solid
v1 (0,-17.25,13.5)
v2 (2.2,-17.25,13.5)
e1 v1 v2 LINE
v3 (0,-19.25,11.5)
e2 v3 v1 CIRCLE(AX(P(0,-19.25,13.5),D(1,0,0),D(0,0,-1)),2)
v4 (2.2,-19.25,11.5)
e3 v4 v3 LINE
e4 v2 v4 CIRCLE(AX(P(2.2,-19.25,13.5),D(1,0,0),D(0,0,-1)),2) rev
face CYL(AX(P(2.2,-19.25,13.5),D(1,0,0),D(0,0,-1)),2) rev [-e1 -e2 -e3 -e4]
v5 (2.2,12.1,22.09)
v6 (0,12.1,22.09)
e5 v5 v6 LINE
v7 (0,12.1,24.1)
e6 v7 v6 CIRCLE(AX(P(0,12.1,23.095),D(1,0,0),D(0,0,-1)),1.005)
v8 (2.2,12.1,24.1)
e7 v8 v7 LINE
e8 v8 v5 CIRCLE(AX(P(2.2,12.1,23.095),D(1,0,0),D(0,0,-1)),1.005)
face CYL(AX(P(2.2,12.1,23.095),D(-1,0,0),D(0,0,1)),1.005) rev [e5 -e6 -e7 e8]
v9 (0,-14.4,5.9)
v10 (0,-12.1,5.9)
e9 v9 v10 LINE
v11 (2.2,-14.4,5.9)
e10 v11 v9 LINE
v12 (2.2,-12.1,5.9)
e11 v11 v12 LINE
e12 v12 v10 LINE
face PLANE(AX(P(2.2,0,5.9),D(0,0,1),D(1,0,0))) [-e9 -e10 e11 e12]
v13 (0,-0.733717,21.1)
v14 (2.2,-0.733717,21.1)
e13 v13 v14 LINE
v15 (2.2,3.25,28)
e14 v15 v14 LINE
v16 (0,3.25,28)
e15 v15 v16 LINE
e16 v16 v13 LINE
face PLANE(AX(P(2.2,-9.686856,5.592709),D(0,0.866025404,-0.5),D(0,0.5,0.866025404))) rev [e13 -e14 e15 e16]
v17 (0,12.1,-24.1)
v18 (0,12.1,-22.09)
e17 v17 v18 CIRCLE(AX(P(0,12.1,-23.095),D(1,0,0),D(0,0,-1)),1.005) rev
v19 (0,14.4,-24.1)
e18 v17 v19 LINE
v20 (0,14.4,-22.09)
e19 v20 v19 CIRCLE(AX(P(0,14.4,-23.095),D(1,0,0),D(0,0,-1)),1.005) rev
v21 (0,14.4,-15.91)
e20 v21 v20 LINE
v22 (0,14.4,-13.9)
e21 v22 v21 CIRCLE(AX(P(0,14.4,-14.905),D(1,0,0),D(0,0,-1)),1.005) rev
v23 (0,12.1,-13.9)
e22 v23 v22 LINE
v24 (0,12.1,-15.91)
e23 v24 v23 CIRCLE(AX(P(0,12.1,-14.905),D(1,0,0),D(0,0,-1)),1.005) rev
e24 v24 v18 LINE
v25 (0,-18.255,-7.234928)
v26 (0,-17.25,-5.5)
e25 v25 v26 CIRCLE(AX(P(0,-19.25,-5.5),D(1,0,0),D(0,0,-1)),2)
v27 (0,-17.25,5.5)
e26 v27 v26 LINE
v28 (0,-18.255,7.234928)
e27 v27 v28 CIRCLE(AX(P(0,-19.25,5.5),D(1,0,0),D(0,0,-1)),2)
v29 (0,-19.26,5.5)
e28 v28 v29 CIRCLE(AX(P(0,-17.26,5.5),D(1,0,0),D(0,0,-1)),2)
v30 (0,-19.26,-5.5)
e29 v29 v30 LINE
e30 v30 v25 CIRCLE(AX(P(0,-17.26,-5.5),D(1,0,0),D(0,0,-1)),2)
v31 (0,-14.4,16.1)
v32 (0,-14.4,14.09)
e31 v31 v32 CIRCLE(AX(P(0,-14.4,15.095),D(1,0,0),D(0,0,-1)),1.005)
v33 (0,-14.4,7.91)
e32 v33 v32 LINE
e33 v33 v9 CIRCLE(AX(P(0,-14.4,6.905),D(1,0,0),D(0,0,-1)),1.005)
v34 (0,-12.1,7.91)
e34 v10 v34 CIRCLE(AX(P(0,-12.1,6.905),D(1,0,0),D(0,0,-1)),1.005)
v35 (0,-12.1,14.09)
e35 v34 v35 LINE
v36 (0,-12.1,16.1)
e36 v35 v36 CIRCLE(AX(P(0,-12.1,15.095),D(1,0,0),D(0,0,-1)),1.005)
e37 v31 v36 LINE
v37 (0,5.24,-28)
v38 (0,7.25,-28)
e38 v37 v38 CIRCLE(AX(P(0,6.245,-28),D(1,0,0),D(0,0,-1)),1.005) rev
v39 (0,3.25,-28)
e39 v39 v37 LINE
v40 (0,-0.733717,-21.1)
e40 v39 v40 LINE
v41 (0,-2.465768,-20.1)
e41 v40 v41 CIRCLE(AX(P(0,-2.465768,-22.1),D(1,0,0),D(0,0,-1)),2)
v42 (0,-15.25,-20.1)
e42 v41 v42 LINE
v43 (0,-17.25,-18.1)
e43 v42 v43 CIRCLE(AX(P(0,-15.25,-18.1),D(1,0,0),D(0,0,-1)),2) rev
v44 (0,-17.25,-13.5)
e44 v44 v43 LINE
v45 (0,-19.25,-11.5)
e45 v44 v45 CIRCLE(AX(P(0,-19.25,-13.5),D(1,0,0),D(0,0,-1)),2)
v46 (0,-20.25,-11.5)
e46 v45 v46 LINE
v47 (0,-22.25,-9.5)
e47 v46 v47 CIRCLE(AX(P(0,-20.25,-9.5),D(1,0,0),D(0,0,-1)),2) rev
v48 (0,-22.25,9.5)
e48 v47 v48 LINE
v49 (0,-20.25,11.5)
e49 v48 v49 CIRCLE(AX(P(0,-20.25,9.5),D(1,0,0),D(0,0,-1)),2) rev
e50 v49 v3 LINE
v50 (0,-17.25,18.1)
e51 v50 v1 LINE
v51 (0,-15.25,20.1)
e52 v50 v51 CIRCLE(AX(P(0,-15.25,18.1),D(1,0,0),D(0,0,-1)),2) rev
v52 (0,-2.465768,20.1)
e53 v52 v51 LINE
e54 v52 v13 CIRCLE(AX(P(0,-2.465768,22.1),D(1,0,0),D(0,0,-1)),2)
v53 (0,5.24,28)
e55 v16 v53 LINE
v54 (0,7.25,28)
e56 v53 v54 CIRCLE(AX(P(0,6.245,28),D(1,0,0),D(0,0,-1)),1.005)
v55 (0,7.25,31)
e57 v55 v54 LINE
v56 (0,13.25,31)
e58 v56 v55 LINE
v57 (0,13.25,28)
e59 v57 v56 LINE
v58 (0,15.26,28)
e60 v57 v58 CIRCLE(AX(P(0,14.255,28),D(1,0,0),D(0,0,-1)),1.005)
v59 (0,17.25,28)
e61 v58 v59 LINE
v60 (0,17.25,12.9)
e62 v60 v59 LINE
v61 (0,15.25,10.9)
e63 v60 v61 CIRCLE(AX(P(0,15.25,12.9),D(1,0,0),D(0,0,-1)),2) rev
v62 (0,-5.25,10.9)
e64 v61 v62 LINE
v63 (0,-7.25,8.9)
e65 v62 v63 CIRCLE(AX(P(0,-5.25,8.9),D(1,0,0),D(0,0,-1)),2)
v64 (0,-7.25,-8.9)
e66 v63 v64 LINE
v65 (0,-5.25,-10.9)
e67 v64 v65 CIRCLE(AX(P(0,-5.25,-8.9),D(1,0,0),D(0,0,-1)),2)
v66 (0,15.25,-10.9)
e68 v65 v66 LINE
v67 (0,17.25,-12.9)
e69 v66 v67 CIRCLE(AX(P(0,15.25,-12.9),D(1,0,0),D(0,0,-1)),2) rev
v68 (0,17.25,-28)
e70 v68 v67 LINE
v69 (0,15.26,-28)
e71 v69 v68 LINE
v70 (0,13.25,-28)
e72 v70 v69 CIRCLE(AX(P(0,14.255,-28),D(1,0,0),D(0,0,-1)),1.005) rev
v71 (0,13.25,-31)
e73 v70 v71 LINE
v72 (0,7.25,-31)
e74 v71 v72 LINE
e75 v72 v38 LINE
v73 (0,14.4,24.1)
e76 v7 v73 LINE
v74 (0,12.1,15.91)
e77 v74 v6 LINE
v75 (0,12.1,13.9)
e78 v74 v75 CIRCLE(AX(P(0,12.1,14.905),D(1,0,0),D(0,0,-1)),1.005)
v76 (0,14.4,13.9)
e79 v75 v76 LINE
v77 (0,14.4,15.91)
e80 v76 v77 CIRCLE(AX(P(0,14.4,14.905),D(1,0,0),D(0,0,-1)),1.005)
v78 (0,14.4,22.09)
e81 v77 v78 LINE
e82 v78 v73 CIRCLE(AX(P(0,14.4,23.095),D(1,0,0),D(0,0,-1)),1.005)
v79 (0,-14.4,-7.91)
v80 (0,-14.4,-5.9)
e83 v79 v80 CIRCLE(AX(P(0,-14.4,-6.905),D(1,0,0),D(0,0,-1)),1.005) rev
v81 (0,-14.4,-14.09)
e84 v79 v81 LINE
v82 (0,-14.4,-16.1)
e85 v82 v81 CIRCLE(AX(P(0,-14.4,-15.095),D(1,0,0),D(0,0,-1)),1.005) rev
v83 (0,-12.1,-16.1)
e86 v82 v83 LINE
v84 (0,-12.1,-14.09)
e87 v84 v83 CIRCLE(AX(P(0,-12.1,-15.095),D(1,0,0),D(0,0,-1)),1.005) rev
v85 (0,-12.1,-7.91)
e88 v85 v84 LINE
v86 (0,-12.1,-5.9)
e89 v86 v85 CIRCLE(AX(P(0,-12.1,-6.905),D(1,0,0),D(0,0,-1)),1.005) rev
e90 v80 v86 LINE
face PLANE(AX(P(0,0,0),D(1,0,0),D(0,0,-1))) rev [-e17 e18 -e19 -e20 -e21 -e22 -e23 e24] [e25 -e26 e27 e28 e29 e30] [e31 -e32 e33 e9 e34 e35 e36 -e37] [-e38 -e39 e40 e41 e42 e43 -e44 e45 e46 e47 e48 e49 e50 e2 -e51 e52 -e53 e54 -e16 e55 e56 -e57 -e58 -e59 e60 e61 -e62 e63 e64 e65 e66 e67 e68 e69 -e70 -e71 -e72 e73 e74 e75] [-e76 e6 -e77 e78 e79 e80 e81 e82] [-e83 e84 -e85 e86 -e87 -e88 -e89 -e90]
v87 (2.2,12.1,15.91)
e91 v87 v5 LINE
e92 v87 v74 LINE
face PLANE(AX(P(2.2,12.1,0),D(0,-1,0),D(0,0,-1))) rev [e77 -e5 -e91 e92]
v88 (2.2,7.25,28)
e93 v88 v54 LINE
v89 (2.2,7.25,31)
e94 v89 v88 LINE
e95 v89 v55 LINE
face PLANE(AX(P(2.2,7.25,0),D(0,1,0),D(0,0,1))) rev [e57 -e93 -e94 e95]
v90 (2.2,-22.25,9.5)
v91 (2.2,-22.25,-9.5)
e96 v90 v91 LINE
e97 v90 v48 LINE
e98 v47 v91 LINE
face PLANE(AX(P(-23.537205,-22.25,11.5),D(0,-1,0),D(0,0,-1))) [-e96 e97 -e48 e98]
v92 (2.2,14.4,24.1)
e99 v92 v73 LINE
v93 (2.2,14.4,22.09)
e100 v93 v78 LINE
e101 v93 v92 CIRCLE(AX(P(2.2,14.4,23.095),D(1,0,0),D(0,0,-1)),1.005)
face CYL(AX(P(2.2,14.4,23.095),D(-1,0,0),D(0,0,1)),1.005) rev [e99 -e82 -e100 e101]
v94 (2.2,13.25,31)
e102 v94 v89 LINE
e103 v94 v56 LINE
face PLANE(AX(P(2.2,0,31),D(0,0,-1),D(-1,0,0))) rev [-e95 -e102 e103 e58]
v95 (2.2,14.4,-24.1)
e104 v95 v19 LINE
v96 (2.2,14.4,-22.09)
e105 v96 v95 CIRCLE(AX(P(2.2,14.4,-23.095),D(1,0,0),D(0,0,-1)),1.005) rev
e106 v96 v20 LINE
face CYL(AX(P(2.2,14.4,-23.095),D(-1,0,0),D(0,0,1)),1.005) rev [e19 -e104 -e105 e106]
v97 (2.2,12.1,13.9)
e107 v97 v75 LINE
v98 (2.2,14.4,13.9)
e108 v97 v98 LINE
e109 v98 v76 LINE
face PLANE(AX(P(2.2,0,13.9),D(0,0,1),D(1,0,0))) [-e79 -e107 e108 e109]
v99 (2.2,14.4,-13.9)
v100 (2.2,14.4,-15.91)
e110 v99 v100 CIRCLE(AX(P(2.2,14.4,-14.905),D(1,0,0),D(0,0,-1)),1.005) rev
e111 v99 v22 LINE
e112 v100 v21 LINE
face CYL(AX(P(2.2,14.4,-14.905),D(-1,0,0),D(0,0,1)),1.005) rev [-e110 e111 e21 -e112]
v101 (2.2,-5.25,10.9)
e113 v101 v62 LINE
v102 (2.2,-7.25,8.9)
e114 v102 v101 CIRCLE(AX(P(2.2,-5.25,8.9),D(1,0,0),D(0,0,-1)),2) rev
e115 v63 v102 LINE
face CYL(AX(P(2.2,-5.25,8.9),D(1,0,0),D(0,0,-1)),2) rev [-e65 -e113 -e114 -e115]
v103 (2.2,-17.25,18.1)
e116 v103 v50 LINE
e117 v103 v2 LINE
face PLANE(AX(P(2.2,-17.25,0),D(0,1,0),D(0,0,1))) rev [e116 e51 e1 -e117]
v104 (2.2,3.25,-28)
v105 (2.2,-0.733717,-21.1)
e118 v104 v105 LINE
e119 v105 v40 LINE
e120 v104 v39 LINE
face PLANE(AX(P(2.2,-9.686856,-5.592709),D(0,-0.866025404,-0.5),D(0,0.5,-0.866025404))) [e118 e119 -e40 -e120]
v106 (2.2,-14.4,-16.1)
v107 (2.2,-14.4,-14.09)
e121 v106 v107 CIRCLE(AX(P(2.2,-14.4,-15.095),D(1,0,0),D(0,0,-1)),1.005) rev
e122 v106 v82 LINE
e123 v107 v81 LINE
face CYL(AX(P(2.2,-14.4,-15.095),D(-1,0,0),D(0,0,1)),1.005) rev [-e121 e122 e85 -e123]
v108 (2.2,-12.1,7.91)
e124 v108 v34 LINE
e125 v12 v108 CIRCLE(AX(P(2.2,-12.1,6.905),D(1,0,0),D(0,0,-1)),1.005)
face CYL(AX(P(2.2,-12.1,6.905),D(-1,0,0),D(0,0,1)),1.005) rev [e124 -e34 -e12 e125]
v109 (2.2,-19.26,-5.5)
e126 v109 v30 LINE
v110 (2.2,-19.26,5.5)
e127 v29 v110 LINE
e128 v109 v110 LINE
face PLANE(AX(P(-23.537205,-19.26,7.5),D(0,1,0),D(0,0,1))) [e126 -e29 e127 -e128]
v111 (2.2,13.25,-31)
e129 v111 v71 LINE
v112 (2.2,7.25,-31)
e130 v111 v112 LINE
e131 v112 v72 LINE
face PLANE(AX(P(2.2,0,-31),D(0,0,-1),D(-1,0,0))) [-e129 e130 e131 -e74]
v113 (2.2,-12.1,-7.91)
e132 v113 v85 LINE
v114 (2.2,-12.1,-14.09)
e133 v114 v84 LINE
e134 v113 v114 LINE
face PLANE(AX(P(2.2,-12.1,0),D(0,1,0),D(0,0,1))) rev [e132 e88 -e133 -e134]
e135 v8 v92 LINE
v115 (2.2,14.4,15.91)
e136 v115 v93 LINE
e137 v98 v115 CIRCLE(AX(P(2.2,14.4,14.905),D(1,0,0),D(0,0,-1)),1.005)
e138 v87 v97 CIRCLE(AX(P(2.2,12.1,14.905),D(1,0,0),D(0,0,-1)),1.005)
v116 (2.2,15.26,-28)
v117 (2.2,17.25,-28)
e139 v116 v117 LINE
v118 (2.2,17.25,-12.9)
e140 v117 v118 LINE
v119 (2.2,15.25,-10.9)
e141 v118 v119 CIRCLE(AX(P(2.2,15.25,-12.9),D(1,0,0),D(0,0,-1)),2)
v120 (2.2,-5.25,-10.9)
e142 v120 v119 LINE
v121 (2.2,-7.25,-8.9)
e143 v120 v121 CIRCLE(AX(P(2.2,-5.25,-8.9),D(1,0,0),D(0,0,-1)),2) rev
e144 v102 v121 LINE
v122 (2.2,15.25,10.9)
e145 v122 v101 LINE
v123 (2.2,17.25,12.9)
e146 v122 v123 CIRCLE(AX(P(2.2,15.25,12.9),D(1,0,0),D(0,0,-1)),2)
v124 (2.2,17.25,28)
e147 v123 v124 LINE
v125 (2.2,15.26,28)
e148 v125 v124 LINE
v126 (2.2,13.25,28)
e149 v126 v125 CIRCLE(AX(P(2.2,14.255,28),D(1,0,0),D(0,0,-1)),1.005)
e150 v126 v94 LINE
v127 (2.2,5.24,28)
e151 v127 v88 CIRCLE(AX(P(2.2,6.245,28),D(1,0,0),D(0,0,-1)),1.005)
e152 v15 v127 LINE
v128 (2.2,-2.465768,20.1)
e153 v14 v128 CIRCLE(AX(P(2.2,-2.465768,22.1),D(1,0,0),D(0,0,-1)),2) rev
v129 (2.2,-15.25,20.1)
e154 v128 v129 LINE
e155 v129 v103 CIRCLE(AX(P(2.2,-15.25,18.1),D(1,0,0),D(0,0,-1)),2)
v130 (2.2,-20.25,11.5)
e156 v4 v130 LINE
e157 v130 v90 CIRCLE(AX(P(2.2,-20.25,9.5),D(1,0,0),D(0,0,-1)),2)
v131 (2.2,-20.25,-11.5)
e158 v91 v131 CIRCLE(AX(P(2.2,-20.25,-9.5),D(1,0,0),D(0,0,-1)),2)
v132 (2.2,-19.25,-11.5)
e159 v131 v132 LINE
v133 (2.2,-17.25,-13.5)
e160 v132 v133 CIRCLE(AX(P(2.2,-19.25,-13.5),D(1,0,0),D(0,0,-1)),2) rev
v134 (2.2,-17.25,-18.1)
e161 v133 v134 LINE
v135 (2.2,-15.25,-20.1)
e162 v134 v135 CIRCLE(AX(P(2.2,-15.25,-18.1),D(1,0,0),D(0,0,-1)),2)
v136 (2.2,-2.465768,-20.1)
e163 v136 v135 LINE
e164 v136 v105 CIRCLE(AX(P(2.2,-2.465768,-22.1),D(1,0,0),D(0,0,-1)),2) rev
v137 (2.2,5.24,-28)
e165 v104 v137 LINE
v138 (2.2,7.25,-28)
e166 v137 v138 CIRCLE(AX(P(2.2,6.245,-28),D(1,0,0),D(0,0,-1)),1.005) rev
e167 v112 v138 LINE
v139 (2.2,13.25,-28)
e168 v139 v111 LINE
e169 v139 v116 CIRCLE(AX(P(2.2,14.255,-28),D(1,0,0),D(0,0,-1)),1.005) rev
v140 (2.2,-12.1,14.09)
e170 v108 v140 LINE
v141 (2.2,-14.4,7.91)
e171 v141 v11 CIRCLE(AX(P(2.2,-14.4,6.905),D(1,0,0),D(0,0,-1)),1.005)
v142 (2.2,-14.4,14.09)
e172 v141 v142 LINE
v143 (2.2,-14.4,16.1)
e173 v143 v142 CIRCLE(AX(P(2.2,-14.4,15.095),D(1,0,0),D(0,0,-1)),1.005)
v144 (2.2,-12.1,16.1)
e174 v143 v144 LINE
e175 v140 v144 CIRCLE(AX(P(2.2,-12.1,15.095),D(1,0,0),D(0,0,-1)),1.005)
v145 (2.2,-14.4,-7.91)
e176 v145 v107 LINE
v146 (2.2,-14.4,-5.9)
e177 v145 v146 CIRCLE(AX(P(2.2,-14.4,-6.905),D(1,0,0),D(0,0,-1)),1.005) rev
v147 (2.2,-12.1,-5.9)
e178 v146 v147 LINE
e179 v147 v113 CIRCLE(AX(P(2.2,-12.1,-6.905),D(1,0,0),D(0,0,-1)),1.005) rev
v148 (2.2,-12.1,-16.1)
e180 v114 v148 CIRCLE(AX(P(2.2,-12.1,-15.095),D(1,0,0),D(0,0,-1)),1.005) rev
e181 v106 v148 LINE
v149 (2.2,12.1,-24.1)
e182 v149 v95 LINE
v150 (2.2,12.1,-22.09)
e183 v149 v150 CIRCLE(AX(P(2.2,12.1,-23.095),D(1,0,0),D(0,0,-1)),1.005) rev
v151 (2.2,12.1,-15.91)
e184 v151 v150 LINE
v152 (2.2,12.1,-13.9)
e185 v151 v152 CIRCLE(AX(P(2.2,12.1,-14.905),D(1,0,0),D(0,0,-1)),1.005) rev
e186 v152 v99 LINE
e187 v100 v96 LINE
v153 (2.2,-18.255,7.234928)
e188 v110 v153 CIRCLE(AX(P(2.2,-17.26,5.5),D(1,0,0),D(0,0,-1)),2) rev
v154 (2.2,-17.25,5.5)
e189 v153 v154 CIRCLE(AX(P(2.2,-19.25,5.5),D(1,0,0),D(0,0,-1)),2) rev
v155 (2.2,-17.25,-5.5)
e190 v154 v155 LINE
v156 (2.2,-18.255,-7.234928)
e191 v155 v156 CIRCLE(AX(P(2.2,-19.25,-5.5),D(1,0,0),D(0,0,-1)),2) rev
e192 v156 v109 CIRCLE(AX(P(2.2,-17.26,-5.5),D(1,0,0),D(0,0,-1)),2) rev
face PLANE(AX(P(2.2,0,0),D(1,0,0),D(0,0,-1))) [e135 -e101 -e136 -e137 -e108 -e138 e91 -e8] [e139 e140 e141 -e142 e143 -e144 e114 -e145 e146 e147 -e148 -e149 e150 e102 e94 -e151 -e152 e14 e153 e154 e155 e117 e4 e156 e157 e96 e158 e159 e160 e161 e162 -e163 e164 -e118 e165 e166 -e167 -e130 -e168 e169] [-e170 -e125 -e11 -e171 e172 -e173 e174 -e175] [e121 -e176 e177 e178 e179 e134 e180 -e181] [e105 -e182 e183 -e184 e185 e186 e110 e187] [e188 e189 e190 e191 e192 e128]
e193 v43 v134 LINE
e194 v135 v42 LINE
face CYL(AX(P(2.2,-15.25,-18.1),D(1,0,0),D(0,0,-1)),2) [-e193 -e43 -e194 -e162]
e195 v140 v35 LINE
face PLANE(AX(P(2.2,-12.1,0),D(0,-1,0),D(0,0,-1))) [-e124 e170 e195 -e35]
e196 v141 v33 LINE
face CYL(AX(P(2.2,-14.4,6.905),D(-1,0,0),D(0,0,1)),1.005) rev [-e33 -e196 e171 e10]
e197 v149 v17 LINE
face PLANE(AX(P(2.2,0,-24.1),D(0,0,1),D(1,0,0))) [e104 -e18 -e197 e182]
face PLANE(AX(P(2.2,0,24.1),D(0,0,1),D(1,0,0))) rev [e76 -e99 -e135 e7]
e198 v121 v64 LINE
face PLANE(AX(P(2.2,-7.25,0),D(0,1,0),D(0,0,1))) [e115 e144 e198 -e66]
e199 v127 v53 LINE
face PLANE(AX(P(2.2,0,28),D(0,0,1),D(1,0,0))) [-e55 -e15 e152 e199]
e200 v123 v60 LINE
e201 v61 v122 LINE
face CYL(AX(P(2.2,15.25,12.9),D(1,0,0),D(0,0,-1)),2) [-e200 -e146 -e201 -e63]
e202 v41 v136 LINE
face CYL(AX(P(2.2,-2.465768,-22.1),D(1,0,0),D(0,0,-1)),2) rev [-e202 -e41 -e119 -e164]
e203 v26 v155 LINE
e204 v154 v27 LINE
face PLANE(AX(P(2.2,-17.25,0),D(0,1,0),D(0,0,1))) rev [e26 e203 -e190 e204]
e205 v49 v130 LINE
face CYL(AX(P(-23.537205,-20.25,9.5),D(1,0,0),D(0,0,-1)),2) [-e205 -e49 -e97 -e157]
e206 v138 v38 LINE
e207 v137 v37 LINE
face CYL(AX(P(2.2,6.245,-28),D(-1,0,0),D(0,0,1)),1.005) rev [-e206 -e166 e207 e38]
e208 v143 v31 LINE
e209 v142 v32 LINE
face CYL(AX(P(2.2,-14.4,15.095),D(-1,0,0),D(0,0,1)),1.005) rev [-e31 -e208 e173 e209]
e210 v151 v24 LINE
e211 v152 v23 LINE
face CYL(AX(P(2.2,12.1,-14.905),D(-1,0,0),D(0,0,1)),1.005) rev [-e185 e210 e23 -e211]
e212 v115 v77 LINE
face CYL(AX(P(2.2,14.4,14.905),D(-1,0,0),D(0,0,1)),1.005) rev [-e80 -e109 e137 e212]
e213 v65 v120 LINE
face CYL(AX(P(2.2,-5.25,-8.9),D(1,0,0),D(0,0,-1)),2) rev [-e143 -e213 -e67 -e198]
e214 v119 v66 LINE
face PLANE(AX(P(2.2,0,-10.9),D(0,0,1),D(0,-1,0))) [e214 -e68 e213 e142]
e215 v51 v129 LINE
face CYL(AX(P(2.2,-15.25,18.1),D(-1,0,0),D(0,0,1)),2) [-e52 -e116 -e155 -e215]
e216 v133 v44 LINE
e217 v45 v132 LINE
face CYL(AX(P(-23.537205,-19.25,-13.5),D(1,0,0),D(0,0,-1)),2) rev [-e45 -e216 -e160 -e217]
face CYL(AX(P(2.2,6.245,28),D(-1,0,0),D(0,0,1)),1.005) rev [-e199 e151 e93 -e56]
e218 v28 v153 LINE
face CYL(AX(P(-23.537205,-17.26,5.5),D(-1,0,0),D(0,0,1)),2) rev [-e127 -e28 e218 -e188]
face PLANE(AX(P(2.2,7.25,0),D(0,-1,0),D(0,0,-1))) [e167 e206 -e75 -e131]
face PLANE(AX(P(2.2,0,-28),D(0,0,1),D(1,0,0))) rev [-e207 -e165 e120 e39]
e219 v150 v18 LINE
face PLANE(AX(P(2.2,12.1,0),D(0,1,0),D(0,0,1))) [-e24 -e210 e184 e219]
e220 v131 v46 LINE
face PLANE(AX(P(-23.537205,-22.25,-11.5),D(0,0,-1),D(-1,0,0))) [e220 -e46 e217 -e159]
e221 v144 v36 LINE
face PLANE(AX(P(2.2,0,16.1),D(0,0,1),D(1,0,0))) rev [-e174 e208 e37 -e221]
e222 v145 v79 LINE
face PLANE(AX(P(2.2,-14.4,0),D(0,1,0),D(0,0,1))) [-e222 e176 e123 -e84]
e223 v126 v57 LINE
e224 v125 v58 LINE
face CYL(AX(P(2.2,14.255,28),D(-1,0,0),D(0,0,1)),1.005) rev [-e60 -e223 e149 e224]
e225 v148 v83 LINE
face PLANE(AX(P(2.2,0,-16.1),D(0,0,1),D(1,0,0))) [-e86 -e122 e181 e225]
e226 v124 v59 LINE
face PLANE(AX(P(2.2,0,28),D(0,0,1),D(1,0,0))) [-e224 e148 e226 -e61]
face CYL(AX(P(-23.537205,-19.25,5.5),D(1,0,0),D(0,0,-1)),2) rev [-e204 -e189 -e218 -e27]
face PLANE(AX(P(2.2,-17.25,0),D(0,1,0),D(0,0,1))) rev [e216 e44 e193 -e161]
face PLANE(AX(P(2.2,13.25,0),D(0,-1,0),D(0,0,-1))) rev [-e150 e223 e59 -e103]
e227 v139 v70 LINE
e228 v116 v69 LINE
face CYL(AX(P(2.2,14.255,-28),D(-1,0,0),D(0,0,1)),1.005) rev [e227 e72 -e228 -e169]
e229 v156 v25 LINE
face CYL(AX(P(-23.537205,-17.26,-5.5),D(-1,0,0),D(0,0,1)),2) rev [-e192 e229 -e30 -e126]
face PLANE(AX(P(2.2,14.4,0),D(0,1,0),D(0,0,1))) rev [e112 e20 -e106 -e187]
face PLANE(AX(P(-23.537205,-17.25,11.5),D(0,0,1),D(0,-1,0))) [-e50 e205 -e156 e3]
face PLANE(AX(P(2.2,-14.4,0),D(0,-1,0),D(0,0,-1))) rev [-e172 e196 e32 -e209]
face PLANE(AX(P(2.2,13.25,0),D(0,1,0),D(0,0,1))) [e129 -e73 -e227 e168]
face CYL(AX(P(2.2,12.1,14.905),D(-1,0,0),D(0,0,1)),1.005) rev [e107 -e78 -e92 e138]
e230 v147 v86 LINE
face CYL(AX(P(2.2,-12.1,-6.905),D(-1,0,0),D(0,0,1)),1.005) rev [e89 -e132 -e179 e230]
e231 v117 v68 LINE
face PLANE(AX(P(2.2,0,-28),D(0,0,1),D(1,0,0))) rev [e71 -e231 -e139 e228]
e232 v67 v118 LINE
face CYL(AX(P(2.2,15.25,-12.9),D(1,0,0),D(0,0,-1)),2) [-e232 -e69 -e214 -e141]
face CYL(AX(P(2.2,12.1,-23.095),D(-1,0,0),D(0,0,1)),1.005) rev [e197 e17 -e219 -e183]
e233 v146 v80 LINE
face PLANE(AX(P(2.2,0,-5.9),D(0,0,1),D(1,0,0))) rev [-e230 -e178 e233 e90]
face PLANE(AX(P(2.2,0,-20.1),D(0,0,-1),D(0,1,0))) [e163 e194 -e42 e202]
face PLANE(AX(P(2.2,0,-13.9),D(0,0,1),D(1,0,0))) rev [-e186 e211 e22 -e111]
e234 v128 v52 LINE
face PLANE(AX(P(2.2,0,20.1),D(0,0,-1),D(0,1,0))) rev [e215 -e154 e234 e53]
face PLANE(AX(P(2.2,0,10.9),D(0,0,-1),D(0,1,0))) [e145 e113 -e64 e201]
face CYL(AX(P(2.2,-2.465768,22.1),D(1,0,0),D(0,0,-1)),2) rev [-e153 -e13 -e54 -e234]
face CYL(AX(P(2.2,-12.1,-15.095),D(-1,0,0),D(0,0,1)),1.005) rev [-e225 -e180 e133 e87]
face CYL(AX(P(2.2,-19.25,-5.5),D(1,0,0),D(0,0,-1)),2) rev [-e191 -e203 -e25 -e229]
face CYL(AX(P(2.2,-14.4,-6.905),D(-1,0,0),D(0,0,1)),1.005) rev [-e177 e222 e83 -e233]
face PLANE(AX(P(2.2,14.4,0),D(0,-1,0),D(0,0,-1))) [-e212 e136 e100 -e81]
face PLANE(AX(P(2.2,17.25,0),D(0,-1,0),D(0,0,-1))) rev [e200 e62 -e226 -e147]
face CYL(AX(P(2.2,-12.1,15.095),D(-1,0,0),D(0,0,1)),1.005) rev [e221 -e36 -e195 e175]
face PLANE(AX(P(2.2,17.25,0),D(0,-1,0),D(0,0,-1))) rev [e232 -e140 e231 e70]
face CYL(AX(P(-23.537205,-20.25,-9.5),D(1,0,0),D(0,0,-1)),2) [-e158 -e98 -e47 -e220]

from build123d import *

# Parameters (mm, degrees)
EXTRUDE_1_DEPTH = 2.2
EXTRUDE_2_DEPTH = 2.2
FILLET_1_R      = 2


with BuildPart() as part:
    # 草图1 → 凸台-拉伸1 (new body)
    with BuildSketch(Plane(origin=(0, 0, 0), x_dir=(0, 0, -1), z_dir=(1, 0, 0))):
        with BuildLine():
            Line((-20.1, -17.25), (20.1, -17.25))
            Line((20.1, -17.25), (20.1, -1.311067127))
            Line((20.1, -1.311067127), (28, 3.25))
            Line((28, 3.25), (28, 5.24))
            ThreePointArc((28, 5.24), (26.995, 6.245), (28, 7.25))
            Line((28, 7.25), (31, 7.25))
            Line((31, 7.25), (31, 13.25))
            Line((31, 13.25), (28, 13.25))
            ThreePointArc((28, 13.25), (26.995, 14.255), (28, 15.26))
            Line((28, 15.26), (28, 17.25))
            Line((28, 17.25), (10.9, 17.25))
            Line((10.9, 17.25), (10.9, -7.25))
            Line((10.9, -7.25), (-10.9, -7.25))
            Line((-10.9, -7.25), (-10.9, 17.25))
            Line((-10.9, 17.25), (-28, 17.25))
            Line((-28, 17.25), (-28, 15.26))
            ThreePointArc((-28, 15.26), (-27.289357685, 14.965642315), (-26.995, 14.255))
            ThreePointArc((-26.995, 14.255), (-27.289357685, 13.544357685), (-28, 13.25))
            Line((-28, 13.25), (-31, 13.25))
            Line((-31, 13.25), (-31, 7.25))
            Line((-31, 7.25), (-28, 7.25))
            ThreePointArc((-28, 7.25), (-27.289357685, 6.955642315), (-26.995, 6.245))
            ThreePointArc((-26.995, 6.245), (-27.289357685, 5.534357685), (-28, 5.24))
            Line((-28, 5.24), (-28, 3.25))
            Line((-28, 3.25), (-20.1, -1.311067127))
            Line((-20.1, -1.311067127), (-20.1, -17.25))
        make_face()
        with BuildLine():
            Line((-7.91, -14.4), (-14.09, -14.4))
            ThreePointArc((-14.09, -14.4), (-15.095, -15.405), (-16.1, -14.4))
            Line((-16.1, -14.4), (-16.1, -12.1))
            ThreePointArc((-16.1, -12.1), (-15.095, -11.095), (-14.09, -12.1))
            Line((-14.09, -12.1), (-7.91, -12.1))
            ThreePointArc((-7.91, -12.1), (-6.905, -11.095), (-5.9, -12.1))
            Line((-5.9, -12.1), (-5.9, -14.4))
            ThreePointArc((-5.9, -14.4), (-6.905, -15.405), (-7.91, -14.4))
        make_face(mode=Mode.SUBTRACT)
        with BuildLine():
            Line((16.1, -12.1), (16.1, -14.4))
            ThreePointArc((16.1, -14.4), (15.095, -15.405), (14.09, -14.4))
            Line((14.09, -14.4), (7.91, -14.4))
            ThreePointArc((7.91, -14.4), (6.905, -15.405), (5.9, -14.4))
            Line((5.9, -14.4), (5.9, -12.1))
            ThreePointArc((5.9, -12.1), (6.905, -11.095), (7.91, -12.1))
            Line((7.91, -12.1), (14.09, -12.1))
            ThreePointArc((14.09, -12.1), (15.095, -11.095), (16.1, -12.1))
        make_face(mode=Mode.SUBTRACT)
        with BuildLine():
            Line((-15.91, 12.1), (-22.09, 12.1))
            ThreePointArc((-22.09, 12.1), (-23.095, 11.095), (-24.1, 12.1))
            Line((-24.1, 12.1), (-24.1, 14.4))
            ThreePointArc((-24.1, 14.4), (-23.095, 15.405), (-22.09, 14.4))
            Line((-22.09, 14.4), (-15.91, 14.4))
            ThreePointArc((-15.91, 14.4), (-14.905, 15.405), (-13.9, 14.4))
            Line((-13.9, 14.4), (-13.9, 12.1))
            ThreePointArc((-13.9, 12.1), (-14.905, 11.095), (-15.91, 12.1))
        make_face(mode=Mode.SUBTRACT)
        with BuildLine():
            Line((13.9, 12.1), (13.9, 14.4))
            ThreePointArc((13.9, 14.4), (14.905, 15.405), (15.91, 14.4))
            Line((15.91, 14.4), (22.09, 14.4))
            ThreePointArc((22.09, 14.4), (23.095, 15.405), (24.1, 14.4))
            Line((24.1, 14.4), (24.1, 12.1))
            ThreePointArc((24.1, 12.1), (23.095, 11.095), (22.09, 12.1))
            Line((22.09, 12.1), (15.91, 12.1))
            ThreePointArc((15.91, 12.1), (14.905, 11.095), (13.9, 12.1))
        make_face(mode=Mode.SUBTRACT)
    extrude(amount=EXTRUDE_1_DEPTH)

    # 草图2 → 凸台-拉伸2 (add)
    with BuildSketch(Plane(origin=(2.2, 0, 0), x_dir=(0, 0, -1), z_dir=(1, 0, 0))):
        Polygon((-11.5, -17.25), (-11.5, -22.25), (11.5, -22.25), (11.5, -17.25), (7.5, -17.25), (7.5, -19.26), (-7.5, -19.26), (-7.5, -17.25), align=None)
    extrude(amount=-EXTRUDE_2_DEPTH)

    # 圆角1
    # the kernel refuses this fillet: 2 mm, written as the material it adds along each edge
    with BuildSketch(Plane(origin=(0, -1.311067127, -20.1), x_dir=(0, -1, 0), z_dir=(1, 0, 0)), Plane(origin=(0, -1.311067127, 20.1), x_dir=(0, 0.49999999999999634, 0.8660254037844408), z_dir=(1, 0, 0))) as fillet_1_piece_1:
        with BuildLine():
            CenterArc((FILLET_1_R * 0.57735026919, FILLET_1_R), FILLET_1_R, 210, 60)
            Line((-FILLET_1_R * 0.288675134595, FILLET_1_R * 0.5), (0, 0))
            Line((0, 0), (FILLET_1_R * 0.57735026919, 0))
        make_face()
    extrude(amount=2.2)
    with BuildSketch(Plane(origin=(0, -7.25, -10.9), x_dir=(0, 1, 0), z_dir=(1, 0, 0)), Plane(origin=(0, -7.25, 10.9), x_dir=(0, 0, -1), z_dir=(1, 0, 0)), Plane(origin=(2.2, -17.25, 7.5), x_dir=(0, 0, -1), z_dir=(-1, 0, 0)), Plane(origin=(2.2, -17.25, -11.5), x_dir=(0, 0, -1), z_dir=(-1, 0, 0))) as fillet_1_piece_2:
        with BuildLine():
            CenterArc((FILLET_1_R, FILLET_1_R), FILLET_1_R, 180, 90)
            Line((0, FILLET_1_R), (0, 0))
            Line((0, 0), (FILLET_1_R, 0))
        make_face()
    extrude(amount=2.2)
    with BuildSketch(Plane(origin=(2.2, -19.26, -7.5), x_dir=(0, 1, 0), z_dir=(-1, 0, 0)), Plane(origin=(2.2, -19.26, 7.5), x_dir=(0, 0, -1), z_dir=(-1, 0, 0)), Plane(origin=(2.2, -17.25, -7.5), x_dir=(0, 0, 1), z_dir=(-1, 0, 0)), Plane(origin=(2.2, -17.25, 11.5), x_dir=(0, 0, 1), z_dir=(-1, 0, 0))) as fillet_1_piece_3:
        with BuildLine():
            CenterArc((FILLET_1_R, -FILLET_1_R), FILLET_1_R, 90, 90)
            Line((0, -FILLET_1_R), (0, 0))
            Line((0, 0), (FILLET_1_R, 0))
        make_face()
    extrude(amount=2.2)
    # the kernel refuses this fillet: 2 mm, written as the material it takes off along each edge
    with BuildSketch(Plane(origin=(-5, -17.25, 20.1), x_dir=(0, 1, 0), z_dir=(1, 0, 0)), Plane(origin=(-5, -17.25, -20.1), x_dir=(0, 0, 1), z_dir=(1, 0, 0)), Plane(origin=(-5, 17.25, -10.9), x_dir=(0, 0, -1), z_dir=(1, 0, 0)), Plane(origin=(-5, 17.25, 10.9), x_dir=(0, -1, 0), z_dir=(1, 0, 0))) as fillet_1_2_piece_1:
        with BuildLine():
            CenterArc((FILLET_1_R, -FILLET_1_R), FILLET_1_R, 90, 90)
            Line((0, -FILLET_1_R), (0, 0))
            Line((0, 0), (FILLET_1_R, 0))
        make_face()
    extrude(amount=12.2, mode=Mode.SUBTRACT)
    with BuildSketch(Plane(origin=(7.2, -22.25, -11.5), x_dir=(0, 0, 1), z_dir=(-1, 0, 0)), Plane(origin=(7.2, -22.25, 11.5), x_dir=(0, 1, 0), z_dir=(-1, 0, 0))) as fillet_1_2_piece_2:
        with BuildLine():
            CenterArc((FILLET_1_R, FILLET_1_R), FILLET_1_R, 180, 90)
            Line((0, FILLET_1_R), (0, 0))
            Line((0, 0), (FILLET_1_R, 0))
        make_face()
    extrude(amount=12.2, mode=Mode.SUBTRACT)


solid = part.part
